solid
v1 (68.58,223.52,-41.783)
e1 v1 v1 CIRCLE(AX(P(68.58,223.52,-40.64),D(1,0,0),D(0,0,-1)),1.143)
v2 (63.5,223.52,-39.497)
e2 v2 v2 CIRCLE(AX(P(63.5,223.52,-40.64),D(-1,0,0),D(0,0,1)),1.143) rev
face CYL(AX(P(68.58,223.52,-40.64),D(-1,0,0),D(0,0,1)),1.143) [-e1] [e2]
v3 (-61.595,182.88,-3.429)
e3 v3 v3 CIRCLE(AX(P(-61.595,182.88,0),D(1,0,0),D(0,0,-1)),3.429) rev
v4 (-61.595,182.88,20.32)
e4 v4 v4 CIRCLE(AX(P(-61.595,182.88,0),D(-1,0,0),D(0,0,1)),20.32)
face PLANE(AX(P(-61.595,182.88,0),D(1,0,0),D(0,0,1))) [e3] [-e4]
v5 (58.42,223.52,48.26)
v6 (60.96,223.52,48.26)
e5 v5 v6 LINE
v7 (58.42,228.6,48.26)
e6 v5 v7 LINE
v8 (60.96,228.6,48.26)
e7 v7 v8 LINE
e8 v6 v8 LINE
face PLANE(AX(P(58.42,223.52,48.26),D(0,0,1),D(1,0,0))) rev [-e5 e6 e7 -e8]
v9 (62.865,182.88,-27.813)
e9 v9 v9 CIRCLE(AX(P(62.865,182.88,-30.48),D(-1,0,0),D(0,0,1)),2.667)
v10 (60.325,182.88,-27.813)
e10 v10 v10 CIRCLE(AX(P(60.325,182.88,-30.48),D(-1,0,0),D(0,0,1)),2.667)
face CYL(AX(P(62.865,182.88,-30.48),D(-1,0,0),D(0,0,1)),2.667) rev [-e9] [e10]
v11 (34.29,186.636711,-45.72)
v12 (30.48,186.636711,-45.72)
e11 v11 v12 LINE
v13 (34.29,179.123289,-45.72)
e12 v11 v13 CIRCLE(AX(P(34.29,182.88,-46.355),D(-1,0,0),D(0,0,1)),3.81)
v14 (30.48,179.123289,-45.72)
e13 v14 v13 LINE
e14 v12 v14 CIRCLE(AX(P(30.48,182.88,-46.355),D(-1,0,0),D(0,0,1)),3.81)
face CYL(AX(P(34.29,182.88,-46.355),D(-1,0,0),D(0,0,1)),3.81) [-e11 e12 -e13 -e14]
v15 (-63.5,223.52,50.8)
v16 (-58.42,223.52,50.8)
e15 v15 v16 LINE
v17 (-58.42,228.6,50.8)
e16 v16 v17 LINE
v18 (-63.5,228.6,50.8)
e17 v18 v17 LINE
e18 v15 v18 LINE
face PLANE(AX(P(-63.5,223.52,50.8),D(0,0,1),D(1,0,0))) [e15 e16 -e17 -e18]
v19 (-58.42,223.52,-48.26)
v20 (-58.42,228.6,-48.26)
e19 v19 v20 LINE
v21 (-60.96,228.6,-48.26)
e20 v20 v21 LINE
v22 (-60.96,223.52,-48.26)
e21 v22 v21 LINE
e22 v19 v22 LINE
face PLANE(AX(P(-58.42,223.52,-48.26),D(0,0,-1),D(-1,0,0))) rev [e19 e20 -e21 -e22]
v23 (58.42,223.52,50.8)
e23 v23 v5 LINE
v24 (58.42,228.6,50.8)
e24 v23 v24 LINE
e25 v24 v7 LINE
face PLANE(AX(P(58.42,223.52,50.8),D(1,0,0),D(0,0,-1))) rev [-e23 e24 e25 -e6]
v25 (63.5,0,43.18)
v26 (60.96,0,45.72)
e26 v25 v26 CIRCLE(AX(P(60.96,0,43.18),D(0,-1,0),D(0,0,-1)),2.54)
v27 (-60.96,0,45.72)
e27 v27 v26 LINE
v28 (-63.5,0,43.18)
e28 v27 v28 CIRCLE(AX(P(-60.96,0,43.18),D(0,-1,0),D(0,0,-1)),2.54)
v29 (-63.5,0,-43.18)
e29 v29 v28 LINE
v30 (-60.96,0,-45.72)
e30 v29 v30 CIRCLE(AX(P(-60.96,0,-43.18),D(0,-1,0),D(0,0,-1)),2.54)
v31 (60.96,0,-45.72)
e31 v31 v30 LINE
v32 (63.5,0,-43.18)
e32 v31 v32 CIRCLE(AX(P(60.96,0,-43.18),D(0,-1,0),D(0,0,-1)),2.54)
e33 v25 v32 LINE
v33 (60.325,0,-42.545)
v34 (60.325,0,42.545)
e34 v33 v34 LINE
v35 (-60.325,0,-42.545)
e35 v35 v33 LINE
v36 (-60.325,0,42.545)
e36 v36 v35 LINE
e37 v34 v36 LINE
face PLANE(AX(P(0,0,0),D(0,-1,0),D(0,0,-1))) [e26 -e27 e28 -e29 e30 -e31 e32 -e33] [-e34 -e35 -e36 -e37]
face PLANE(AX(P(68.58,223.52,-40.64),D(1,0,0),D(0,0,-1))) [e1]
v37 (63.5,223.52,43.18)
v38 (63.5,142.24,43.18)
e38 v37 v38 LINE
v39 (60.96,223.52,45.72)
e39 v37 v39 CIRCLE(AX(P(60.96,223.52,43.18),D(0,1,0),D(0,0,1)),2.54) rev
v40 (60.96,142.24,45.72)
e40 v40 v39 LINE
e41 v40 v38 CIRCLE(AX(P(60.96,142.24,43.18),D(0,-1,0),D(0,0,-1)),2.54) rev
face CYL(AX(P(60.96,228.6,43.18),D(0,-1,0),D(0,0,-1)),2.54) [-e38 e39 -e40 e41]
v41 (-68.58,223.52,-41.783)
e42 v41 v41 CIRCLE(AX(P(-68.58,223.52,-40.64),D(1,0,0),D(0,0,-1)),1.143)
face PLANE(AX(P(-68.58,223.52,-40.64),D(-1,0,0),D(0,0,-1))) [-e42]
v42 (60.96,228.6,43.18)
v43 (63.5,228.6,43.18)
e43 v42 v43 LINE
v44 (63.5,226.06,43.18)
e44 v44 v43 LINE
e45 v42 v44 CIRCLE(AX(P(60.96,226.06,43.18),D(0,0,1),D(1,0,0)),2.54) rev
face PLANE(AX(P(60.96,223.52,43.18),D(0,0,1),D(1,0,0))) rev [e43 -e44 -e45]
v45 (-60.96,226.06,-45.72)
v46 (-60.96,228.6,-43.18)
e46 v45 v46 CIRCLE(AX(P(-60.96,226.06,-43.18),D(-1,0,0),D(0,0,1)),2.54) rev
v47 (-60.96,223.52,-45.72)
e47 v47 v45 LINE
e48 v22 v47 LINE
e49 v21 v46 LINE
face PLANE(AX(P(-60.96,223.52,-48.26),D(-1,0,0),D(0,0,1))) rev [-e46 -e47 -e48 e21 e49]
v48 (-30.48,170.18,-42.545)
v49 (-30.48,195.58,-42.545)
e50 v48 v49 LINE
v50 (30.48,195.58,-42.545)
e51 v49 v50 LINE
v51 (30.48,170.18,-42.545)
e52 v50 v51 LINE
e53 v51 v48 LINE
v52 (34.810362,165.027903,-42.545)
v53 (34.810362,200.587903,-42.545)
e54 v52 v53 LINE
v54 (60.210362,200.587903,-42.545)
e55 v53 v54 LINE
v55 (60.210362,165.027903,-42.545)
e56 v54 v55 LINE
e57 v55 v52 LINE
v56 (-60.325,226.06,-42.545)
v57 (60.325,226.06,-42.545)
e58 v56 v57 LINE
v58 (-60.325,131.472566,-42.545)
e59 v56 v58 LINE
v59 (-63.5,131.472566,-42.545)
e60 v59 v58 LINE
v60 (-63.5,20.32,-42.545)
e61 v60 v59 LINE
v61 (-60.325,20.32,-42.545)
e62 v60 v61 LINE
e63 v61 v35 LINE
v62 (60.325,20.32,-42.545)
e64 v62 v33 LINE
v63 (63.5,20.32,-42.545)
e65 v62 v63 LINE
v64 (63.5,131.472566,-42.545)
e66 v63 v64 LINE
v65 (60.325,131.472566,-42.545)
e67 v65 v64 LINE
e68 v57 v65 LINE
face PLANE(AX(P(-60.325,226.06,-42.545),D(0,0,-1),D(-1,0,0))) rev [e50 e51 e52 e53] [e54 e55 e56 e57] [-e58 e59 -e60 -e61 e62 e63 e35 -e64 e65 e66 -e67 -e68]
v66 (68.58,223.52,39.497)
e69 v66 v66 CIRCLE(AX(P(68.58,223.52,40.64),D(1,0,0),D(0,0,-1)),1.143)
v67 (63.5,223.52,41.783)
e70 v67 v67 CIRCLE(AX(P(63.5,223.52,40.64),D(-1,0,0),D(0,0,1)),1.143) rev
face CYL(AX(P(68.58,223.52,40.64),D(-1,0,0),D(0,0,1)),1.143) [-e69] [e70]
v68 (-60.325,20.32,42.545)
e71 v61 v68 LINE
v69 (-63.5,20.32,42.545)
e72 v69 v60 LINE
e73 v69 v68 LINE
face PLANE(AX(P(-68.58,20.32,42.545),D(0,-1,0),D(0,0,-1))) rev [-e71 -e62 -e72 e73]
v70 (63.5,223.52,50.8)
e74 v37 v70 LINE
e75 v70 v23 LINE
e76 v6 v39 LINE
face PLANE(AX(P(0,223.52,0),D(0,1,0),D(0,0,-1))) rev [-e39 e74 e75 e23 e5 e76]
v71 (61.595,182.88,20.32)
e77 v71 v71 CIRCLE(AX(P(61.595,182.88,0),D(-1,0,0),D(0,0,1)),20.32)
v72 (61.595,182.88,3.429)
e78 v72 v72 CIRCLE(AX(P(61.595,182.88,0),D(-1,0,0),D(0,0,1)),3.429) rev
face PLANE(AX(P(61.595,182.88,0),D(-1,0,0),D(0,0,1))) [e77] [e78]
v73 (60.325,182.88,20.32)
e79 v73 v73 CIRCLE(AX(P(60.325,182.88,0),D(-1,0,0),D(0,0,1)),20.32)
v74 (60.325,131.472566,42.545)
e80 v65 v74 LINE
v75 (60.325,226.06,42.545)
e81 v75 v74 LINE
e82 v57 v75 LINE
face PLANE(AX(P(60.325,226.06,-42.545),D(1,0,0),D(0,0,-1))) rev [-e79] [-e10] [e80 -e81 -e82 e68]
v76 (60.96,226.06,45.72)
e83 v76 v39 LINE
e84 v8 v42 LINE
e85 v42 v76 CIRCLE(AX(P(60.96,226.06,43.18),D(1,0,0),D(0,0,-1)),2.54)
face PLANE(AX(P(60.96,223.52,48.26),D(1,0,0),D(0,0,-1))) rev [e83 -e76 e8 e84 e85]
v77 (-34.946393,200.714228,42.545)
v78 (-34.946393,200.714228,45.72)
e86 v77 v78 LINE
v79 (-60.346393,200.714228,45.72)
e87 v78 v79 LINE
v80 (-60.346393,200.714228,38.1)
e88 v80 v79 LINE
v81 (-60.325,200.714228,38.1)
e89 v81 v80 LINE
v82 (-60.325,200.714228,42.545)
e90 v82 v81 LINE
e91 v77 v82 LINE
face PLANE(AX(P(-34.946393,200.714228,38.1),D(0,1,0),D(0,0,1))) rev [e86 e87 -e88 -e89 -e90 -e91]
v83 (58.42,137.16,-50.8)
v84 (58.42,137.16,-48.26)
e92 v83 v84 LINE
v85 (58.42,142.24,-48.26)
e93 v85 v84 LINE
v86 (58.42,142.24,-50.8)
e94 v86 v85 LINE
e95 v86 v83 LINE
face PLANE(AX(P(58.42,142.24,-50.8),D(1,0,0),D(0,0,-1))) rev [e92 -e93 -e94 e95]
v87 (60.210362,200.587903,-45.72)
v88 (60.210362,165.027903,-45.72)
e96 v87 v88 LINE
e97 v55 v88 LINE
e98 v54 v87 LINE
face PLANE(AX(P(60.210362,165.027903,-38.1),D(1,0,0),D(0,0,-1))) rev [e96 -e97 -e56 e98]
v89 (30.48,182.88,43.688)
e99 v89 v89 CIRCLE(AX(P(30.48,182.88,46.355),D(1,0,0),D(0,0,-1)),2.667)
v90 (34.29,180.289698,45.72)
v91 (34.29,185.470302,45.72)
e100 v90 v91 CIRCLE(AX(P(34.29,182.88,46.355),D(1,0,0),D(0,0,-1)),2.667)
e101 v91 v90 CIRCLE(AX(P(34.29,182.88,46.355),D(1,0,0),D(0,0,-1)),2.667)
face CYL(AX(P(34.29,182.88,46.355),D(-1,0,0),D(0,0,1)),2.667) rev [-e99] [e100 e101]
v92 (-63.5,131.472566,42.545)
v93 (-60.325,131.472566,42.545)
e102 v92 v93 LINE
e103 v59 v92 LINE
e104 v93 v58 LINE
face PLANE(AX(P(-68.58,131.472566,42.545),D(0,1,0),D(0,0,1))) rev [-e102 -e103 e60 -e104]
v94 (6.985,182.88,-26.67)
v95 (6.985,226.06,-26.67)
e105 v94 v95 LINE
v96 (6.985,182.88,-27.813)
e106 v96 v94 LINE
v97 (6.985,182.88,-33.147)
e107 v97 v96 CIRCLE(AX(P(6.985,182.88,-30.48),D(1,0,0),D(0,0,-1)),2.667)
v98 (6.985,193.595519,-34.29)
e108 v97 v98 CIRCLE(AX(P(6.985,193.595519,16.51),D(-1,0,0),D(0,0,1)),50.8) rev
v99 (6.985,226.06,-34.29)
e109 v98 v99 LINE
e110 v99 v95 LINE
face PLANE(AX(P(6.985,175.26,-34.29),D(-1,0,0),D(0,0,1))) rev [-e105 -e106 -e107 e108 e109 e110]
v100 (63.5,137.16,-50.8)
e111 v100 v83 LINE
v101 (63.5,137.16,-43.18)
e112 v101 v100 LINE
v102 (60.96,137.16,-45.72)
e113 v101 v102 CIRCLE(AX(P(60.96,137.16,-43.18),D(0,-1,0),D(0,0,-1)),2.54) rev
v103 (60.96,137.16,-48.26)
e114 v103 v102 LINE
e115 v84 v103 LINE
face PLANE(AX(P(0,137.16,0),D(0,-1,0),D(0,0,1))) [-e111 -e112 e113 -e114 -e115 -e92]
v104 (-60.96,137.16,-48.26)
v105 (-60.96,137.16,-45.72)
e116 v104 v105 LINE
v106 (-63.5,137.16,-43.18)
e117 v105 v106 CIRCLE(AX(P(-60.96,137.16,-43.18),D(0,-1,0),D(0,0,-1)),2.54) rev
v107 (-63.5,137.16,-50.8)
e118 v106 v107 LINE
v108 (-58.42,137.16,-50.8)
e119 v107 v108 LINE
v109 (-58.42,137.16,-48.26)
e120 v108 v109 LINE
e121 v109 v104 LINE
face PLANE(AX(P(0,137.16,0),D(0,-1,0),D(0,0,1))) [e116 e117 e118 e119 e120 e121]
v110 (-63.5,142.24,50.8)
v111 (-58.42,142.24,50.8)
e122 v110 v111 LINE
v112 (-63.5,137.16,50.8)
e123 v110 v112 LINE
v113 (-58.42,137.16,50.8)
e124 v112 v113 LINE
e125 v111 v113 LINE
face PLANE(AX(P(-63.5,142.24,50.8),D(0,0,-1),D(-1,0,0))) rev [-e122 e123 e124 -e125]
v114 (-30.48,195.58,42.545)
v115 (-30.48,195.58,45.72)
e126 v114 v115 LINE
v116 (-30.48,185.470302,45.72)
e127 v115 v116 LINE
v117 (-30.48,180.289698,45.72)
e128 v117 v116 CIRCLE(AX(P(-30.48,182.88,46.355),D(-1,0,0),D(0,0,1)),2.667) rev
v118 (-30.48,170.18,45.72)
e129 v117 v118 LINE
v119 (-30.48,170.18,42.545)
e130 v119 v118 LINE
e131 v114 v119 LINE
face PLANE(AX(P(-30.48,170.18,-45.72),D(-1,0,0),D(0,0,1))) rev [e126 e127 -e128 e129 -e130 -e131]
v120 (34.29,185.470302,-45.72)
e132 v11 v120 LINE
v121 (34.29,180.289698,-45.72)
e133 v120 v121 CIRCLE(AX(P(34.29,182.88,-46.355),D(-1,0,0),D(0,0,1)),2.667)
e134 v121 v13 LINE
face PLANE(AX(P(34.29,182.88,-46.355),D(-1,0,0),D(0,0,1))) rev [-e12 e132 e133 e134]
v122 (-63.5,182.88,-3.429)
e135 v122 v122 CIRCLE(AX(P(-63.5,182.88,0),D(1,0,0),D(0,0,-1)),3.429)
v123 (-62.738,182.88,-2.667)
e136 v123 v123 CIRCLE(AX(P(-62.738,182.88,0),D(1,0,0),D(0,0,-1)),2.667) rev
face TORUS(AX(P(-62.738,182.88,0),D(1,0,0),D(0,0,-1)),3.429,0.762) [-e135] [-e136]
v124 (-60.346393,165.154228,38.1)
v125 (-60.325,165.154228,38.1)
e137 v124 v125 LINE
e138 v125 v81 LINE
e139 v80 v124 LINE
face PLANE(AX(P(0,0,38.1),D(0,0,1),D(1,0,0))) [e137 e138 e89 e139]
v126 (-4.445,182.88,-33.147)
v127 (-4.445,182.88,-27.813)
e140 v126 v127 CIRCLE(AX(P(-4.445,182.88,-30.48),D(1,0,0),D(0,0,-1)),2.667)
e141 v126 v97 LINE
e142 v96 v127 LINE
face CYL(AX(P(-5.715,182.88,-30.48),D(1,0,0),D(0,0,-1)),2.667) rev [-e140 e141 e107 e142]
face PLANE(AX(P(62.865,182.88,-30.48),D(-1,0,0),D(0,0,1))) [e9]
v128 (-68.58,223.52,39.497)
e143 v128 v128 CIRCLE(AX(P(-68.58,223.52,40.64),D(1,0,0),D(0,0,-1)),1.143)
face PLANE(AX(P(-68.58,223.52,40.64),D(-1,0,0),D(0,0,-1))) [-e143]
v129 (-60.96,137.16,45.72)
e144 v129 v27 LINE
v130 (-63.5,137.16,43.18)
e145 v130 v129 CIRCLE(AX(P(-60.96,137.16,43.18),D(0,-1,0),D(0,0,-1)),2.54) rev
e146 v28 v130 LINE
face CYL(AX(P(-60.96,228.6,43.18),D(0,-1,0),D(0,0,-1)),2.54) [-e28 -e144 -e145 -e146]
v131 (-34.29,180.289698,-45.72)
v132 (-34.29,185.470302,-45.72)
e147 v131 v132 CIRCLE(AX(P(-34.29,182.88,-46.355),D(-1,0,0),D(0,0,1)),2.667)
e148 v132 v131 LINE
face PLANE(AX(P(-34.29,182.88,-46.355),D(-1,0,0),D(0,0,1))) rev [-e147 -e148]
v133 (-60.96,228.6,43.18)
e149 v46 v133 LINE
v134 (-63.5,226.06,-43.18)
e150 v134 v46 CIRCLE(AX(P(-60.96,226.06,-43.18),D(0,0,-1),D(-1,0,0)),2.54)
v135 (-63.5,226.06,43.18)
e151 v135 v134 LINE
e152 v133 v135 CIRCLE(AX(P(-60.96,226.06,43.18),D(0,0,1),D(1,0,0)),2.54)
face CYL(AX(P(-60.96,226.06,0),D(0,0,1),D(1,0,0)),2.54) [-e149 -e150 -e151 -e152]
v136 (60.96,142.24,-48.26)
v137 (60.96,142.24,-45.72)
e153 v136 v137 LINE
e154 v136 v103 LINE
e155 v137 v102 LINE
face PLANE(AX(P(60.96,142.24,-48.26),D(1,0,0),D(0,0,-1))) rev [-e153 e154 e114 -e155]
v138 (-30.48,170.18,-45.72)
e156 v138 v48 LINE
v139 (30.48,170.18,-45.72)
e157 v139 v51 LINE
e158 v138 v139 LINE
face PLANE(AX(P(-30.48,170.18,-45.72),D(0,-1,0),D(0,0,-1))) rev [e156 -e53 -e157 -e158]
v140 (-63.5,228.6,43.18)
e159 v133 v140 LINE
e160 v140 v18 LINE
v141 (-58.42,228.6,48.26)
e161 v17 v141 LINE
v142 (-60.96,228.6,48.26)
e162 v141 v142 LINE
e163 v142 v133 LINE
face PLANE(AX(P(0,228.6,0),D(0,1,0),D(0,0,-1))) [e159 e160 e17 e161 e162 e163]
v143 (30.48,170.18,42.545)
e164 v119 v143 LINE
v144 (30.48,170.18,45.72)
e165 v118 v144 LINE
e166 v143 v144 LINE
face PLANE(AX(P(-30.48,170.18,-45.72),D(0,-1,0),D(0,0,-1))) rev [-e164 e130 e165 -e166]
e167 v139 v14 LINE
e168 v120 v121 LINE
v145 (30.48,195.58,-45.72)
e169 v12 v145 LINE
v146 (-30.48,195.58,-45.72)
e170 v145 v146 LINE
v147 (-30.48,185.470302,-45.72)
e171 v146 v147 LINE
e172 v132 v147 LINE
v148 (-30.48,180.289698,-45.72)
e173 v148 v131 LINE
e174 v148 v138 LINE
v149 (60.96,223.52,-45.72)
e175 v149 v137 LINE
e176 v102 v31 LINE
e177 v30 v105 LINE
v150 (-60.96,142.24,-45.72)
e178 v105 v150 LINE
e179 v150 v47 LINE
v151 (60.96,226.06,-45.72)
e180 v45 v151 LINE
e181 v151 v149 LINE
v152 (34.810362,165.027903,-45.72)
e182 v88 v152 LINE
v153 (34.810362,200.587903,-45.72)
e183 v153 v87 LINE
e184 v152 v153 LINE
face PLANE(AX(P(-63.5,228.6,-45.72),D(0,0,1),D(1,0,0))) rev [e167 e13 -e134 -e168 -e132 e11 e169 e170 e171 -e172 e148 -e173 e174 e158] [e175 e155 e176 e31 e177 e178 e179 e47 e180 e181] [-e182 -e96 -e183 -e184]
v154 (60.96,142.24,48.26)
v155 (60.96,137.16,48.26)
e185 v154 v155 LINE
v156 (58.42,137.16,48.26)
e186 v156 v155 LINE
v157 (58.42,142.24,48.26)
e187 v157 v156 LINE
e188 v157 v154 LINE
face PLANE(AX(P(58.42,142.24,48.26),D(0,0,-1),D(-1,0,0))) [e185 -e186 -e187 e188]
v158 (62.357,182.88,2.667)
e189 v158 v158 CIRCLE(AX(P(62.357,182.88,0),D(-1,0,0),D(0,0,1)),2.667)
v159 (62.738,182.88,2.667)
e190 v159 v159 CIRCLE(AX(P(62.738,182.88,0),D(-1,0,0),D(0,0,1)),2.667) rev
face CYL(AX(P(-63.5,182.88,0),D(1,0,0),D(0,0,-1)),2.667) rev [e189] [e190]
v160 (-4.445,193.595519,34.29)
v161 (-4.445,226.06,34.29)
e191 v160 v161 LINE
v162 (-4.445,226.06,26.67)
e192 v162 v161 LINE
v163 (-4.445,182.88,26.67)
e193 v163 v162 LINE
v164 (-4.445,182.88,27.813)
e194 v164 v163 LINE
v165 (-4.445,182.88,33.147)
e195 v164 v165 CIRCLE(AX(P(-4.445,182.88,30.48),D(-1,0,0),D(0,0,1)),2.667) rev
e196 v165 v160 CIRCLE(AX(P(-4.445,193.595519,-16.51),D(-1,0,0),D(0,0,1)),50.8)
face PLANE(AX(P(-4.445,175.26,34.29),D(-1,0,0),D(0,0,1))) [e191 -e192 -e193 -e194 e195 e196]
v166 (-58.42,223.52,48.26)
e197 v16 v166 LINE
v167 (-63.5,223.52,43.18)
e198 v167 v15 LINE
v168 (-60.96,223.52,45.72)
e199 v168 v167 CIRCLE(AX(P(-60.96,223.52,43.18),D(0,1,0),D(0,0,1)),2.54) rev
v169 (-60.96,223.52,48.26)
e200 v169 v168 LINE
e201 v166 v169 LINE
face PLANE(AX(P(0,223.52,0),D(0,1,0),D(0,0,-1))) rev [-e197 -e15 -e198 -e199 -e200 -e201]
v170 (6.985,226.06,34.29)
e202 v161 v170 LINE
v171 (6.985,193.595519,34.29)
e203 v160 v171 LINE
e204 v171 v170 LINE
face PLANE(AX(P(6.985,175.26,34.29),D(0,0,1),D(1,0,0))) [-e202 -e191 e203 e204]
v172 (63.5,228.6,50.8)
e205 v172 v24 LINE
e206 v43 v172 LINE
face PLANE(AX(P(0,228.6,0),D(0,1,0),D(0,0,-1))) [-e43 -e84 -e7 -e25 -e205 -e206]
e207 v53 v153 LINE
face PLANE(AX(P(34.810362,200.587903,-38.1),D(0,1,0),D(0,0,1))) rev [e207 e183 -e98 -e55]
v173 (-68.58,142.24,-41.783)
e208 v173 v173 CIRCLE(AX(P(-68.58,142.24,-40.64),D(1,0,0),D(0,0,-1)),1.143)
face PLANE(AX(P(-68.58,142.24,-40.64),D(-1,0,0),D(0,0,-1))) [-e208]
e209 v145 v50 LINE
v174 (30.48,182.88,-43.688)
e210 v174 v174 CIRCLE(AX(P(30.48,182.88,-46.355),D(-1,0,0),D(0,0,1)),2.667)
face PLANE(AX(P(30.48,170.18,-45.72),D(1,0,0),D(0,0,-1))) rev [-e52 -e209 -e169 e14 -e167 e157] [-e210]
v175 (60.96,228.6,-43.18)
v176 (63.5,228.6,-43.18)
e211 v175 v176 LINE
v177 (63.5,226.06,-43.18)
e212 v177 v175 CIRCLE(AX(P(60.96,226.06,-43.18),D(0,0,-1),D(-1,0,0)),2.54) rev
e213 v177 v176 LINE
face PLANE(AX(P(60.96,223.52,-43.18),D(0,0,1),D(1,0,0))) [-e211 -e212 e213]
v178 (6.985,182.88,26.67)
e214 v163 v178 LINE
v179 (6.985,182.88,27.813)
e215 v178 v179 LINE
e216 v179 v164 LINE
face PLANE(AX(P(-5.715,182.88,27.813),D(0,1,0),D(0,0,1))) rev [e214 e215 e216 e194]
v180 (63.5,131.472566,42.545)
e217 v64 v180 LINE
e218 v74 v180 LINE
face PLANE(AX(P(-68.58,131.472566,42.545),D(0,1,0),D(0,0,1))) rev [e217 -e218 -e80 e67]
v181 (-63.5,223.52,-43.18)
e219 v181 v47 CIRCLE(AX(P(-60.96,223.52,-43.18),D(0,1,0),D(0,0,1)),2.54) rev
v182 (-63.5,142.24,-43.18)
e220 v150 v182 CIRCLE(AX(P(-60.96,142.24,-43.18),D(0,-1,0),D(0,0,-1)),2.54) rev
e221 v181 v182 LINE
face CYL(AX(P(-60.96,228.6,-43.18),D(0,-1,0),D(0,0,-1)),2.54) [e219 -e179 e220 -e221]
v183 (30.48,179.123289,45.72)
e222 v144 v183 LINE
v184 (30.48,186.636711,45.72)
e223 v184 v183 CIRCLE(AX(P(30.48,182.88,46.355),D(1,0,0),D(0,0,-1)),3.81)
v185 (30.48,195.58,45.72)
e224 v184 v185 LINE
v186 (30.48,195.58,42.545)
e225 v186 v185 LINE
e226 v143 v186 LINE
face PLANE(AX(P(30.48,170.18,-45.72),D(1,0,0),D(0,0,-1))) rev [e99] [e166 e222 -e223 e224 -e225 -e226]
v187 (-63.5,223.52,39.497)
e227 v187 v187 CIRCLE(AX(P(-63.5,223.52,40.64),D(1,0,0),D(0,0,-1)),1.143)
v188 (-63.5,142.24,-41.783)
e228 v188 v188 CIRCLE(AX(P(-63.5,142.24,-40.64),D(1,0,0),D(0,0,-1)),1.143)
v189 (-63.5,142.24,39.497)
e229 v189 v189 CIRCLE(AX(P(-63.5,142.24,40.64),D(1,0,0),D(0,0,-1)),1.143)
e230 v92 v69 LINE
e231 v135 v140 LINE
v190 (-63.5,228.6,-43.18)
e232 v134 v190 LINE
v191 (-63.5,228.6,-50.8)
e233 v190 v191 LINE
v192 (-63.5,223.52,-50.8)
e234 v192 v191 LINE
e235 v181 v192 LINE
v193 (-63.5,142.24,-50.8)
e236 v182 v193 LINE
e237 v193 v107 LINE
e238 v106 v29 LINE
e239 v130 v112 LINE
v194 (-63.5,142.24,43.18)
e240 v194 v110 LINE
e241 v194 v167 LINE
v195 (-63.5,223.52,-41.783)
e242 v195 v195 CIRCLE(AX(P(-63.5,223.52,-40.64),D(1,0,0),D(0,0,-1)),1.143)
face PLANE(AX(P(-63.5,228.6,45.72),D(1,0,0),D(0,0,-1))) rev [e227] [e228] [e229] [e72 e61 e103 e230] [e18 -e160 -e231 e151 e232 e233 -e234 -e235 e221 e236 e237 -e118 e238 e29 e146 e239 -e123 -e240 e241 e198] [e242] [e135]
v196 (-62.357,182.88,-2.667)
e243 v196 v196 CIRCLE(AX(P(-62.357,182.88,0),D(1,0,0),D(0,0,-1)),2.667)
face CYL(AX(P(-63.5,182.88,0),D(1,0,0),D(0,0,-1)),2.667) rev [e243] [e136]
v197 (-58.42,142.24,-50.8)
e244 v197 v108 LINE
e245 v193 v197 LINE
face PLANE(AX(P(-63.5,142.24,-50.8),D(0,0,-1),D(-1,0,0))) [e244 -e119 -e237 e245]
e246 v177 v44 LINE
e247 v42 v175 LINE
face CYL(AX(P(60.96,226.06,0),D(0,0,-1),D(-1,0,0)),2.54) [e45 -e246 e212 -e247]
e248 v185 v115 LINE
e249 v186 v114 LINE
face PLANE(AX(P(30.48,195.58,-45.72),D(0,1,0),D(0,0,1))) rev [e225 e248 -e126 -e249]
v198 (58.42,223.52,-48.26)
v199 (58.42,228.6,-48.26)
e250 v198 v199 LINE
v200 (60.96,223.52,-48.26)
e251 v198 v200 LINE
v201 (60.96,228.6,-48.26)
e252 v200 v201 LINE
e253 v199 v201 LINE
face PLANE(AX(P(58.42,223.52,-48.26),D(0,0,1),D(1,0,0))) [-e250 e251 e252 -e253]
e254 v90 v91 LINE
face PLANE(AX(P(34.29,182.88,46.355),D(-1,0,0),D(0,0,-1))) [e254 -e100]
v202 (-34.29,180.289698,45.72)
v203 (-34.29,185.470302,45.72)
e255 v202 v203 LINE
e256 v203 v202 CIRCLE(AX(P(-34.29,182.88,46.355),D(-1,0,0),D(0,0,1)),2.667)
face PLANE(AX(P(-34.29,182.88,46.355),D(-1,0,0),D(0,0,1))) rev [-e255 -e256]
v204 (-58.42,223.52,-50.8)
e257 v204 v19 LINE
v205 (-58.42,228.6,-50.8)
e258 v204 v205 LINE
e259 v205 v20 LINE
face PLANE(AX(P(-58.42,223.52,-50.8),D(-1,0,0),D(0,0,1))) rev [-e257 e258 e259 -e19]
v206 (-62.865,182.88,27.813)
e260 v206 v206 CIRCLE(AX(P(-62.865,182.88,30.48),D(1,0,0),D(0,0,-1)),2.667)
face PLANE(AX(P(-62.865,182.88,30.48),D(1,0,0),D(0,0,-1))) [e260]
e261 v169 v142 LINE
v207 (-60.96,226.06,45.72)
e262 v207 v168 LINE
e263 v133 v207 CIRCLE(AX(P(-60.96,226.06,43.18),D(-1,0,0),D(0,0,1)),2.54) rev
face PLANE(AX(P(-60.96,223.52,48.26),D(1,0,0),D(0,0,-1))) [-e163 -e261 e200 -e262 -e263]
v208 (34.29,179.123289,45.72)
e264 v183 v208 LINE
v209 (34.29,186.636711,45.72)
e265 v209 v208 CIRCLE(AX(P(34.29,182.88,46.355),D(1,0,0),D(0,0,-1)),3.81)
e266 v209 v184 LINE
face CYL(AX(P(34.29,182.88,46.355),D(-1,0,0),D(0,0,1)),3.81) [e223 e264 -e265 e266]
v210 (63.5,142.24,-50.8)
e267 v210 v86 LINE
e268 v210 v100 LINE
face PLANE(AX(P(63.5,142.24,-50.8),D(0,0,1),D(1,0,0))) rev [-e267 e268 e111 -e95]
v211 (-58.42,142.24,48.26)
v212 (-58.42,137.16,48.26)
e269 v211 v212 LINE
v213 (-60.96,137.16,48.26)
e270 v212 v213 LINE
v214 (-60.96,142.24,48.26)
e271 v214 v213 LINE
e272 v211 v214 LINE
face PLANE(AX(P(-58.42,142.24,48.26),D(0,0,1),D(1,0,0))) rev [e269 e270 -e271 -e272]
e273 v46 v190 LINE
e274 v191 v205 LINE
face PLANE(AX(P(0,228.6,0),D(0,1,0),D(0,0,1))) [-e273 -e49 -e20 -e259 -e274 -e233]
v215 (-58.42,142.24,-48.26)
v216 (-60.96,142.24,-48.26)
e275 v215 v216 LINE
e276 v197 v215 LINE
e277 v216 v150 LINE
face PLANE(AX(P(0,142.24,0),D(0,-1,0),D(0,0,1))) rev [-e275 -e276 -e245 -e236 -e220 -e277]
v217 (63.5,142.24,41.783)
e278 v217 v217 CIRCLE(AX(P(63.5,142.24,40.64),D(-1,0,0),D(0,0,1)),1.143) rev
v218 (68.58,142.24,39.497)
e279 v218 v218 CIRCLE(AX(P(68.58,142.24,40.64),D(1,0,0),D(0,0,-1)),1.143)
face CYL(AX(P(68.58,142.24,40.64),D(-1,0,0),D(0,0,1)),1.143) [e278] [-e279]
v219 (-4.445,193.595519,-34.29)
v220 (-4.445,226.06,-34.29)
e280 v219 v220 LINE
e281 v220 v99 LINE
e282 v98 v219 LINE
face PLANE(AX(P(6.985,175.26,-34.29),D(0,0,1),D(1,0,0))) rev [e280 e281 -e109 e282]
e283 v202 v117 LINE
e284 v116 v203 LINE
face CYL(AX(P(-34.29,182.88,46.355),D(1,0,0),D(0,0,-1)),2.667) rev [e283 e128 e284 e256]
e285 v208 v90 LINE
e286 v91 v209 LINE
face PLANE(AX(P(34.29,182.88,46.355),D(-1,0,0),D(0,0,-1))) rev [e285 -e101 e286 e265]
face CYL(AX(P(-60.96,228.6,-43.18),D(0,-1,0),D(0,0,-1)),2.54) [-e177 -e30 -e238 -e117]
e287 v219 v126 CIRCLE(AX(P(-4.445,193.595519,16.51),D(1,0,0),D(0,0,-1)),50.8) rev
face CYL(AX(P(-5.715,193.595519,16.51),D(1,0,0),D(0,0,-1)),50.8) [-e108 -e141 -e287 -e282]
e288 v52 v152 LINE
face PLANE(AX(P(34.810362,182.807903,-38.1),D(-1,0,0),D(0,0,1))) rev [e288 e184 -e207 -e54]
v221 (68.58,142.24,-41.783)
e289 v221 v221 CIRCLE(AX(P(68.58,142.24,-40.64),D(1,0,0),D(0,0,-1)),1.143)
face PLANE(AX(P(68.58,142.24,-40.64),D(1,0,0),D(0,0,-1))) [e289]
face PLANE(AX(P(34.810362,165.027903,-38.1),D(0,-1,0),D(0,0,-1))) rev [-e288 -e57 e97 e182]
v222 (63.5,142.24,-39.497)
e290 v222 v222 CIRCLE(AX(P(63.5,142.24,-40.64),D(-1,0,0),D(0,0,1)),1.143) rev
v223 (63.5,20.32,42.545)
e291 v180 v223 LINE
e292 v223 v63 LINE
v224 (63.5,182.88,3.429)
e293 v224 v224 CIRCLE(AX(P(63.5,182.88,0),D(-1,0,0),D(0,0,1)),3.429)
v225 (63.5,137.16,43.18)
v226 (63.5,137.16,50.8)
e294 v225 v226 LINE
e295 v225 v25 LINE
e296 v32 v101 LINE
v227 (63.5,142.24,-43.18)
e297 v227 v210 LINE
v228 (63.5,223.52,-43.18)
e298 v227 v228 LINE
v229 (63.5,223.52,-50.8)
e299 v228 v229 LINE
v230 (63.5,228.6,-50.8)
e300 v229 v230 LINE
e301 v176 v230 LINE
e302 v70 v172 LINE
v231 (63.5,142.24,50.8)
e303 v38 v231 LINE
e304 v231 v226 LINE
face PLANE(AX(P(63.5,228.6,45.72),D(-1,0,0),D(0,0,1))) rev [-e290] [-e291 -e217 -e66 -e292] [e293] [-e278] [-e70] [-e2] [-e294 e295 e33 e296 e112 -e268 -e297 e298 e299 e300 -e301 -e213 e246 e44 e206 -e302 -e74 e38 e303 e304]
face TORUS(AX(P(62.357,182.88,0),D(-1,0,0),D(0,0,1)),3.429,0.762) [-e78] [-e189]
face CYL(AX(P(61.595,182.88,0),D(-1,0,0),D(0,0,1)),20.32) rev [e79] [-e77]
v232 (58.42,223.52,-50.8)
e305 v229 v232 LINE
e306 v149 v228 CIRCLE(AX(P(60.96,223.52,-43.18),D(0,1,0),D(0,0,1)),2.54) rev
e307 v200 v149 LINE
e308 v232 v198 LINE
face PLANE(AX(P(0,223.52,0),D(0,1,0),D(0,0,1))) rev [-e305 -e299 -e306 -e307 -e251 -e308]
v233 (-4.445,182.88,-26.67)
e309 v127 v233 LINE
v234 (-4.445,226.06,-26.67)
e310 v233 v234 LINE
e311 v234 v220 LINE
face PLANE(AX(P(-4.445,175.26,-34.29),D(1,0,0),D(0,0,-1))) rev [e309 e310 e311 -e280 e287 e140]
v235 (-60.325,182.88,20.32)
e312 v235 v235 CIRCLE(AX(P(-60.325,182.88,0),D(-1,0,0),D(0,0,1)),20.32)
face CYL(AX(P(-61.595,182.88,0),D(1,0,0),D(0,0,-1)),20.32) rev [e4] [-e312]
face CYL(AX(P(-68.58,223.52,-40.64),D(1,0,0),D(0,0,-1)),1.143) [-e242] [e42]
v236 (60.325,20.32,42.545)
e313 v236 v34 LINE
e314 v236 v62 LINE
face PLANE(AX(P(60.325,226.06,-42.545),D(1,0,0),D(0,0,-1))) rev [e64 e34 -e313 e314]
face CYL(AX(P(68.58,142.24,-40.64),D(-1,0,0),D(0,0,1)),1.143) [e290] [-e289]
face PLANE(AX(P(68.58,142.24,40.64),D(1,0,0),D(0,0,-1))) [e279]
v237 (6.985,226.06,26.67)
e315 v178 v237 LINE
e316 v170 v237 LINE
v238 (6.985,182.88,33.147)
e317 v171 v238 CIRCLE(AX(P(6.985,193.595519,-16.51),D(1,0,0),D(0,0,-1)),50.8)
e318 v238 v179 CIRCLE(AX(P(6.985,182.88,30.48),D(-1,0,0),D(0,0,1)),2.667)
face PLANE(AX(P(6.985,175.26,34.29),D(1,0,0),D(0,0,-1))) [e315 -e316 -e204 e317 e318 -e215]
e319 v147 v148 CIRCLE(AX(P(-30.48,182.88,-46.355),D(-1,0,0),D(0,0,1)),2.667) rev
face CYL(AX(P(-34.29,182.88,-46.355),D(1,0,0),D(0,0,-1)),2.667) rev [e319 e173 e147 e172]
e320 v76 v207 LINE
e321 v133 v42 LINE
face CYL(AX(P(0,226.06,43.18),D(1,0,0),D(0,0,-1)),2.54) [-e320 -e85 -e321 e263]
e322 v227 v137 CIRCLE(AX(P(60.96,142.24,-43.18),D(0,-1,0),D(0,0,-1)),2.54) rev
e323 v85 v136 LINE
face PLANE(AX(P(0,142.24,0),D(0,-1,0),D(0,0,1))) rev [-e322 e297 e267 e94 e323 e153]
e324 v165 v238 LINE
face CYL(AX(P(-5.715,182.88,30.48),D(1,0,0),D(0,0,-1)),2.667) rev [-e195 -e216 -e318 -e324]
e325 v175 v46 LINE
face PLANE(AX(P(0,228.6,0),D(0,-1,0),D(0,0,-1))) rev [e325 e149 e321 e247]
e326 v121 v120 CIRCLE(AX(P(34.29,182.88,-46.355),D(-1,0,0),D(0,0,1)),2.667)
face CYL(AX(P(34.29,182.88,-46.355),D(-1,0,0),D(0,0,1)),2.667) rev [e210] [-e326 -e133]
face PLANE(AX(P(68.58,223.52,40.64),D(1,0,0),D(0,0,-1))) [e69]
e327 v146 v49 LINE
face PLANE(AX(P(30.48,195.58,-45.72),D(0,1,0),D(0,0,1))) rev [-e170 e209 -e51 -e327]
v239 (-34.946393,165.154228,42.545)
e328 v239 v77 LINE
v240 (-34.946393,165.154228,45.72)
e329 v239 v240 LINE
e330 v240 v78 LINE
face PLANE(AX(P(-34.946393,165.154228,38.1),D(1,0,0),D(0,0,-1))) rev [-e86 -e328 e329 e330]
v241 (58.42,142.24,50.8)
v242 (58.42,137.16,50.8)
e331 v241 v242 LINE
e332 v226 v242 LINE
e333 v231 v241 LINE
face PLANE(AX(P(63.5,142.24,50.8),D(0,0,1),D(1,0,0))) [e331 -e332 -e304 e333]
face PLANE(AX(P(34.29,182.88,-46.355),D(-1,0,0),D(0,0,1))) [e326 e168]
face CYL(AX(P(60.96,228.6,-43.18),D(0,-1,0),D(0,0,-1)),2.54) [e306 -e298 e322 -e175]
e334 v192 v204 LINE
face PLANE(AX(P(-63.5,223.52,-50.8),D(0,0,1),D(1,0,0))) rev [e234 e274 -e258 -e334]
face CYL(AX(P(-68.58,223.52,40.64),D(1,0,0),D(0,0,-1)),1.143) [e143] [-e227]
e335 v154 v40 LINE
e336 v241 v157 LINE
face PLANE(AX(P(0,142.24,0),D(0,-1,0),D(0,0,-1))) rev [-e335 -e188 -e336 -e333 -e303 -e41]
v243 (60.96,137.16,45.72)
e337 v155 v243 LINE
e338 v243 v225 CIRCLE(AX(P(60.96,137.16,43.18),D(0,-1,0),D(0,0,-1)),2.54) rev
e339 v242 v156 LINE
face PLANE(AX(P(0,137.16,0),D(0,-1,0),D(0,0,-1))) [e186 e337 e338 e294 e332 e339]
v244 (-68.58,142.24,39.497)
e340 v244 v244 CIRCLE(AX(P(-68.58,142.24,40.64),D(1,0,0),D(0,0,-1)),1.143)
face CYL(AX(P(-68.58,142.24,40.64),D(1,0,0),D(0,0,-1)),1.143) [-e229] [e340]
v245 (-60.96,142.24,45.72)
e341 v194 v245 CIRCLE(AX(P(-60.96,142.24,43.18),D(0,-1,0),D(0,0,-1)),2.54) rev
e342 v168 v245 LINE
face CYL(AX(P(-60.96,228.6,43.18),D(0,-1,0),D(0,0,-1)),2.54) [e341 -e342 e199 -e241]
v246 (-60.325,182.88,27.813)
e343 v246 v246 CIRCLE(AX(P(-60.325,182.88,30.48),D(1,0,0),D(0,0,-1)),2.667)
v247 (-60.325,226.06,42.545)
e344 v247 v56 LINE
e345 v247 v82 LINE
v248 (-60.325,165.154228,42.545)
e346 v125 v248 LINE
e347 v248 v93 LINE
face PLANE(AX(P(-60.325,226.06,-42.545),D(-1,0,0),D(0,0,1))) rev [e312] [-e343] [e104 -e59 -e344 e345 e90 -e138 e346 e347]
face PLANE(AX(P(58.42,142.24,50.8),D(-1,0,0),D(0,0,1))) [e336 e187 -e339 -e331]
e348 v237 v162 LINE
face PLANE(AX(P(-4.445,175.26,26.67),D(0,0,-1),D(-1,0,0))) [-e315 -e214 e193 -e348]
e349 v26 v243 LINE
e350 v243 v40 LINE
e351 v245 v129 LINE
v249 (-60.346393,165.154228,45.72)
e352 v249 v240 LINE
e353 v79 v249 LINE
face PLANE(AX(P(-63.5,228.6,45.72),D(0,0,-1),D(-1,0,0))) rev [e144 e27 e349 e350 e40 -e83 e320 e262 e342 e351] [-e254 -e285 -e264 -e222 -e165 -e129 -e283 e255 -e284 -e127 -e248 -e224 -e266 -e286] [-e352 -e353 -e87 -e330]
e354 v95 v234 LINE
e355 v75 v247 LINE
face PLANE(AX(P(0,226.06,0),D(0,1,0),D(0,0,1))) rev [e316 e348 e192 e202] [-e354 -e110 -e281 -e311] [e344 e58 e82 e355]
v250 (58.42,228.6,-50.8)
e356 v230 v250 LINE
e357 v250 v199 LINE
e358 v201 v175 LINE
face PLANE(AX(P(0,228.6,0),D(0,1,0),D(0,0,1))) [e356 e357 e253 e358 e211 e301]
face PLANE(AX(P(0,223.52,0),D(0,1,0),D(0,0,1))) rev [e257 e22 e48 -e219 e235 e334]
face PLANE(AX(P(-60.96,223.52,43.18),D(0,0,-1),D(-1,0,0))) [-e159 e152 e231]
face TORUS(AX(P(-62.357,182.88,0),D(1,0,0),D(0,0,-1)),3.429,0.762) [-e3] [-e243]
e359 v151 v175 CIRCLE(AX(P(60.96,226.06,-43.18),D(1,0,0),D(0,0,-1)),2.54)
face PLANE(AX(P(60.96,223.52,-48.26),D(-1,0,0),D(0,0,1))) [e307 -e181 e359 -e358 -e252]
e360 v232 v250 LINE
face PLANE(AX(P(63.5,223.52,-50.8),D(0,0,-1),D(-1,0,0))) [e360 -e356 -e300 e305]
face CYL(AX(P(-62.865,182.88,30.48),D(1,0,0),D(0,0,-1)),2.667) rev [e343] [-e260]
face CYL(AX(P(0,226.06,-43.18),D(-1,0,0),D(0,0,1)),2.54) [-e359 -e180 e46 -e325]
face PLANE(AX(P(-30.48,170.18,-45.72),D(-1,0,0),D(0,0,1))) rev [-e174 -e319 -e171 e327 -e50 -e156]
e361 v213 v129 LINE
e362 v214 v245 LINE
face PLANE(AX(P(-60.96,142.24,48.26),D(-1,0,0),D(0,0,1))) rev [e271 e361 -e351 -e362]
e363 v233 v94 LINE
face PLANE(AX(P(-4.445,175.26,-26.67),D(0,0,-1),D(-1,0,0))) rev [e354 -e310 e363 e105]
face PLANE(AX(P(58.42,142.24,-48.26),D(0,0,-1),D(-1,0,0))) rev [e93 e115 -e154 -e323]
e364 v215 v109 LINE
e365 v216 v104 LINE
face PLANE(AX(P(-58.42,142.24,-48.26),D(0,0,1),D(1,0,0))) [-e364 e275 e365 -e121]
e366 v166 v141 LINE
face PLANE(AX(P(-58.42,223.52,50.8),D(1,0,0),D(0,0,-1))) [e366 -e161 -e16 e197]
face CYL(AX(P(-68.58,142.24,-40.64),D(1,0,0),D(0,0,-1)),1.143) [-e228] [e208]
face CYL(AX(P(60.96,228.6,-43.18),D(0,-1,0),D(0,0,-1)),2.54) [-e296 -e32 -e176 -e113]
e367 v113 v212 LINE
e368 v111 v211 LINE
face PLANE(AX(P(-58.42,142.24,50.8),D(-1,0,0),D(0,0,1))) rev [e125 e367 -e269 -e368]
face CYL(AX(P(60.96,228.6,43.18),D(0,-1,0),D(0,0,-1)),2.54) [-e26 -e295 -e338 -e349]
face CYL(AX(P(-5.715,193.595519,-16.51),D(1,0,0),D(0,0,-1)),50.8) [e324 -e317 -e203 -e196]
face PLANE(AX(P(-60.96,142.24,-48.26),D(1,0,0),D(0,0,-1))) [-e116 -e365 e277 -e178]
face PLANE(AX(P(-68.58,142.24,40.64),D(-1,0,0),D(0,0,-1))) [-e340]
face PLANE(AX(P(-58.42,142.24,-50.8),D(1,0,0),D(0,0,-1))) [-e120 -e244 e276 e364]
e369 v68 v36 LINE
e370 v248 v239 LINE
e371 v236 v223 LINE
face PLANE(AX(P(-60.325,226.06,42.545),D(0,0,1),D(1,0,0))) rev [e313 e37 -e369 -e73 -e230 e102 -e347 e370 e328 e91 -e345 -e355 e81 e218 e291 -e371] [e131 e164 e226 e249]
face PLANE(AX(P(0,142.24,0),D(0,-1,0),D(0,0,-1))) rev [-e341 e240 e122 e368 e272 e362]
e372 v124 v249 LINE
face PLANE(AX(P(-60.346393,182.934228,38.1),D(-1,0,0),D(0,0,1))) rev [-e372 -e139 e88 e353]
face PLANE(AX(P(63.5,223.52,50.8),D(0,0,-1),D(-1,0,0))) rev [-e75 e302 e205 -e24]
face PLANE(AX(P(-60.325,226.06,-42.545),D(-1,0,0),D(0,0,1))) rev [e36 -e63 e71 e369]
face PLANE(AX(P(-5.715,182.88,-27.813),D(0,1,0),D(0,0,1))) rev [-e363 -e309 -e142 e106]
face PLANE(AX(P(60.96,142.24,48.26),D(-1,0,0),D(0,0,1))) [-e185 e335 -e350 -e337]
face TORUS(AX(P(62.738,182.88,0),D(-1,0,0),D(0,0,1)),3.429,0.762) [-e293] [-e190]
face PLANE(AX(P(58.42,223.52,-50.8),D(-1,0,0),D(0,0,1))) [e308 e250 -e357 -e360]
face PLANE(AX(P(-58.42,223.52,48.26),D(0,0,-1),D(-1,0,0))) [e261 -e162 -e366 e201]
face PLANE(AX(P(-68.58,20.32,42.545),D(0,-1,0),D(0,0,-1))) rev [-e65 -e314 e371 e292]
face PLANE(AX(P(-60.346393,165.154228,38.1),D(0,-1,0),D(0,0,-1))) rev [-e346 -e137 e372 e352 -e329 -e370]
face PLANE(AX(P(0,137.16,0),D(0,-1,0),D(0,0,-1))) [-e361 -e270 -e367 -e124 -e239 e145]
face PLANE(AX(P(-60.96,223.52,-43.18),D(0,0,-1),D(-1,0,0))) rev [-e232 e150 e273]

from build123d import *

# Parameters (mm, degrees)
SKETCH1_W            = 127
SKETCH1_H            = 91.44
BOSS_EXTRUDE1_DEPTH  = 228.6
SKETCH3_W            = 120.65
SKETCH3_H            = 85.09
CUT_EXTRUDE1_DEPTH   = 226.06
SKETCH2_R            = 2.667
CUT_EXTRUDE2_DEPTH   = 266.475570251
SKETCH4_R            = 1.143
BOSS_EXTRUDE3_DEPTH  = 5.08
SKETCH5_R            = 20.32
CUT_EXTRUDE3_DEPTH   = 1.27
FILLET1_R            = 0.762
FILLET2_R            = 0.762
FILLET3_R            = 0.762
SKETCH6_W            = 60.96
SKETCH6_H            = 25.4
CUT_EXTRUDE4_DEPTH   = 256.582569828
FILLET4_R            = 2.54
SKETCH7_W            = 85.09
SKETCH7_H            = 111.152565629
CUT_EXTRUDE5_DEPTH   = 268.942913323
SKETCH10_R           = 2.667
CUT_EXTRUDE6_DEPTH   = 2.54
CUT_EXTRUDE7_DEPTH   = 7.62
SKETCH13_R           = 2.667
CUT_EXTRUDE8_DEPTH   = 2.54
CUT_EXTRUDE9_DEPTH   = 7.62
SKETCH20_W           = 11.43
SKETCH20_H           = 7.62
BOSS_EXTRUDE4_DEPTH  = 50.8
CUT_EXTRUDE10_START  = -12.7
SKETCH21_R           = 2.667
CUT_EXTRUDE10_DEPTH  = 12.7
CUT_EXTRUDE11_DEPTH  = 12.7
SKETCH24_R           = 3.81
BOSS_EXTRUDE5_DEPTH  = 3.81
SKETCH25_R           = 2.667
CUT_EXTRUDE12_DEPTH  = 3.81
CUT_EXTRUDE13_DEPTH  = 12.7
CUT_EXTRUDE14_START  = 64.77
SKETCH27_R           = 2.667
CUT_EXTRUDE14_DEPTH  = 64.77
CUT_EXTRUDE15_START  = 64.77
SKETCH29_R           = 2.667
CUT_EXTRUDE15_DEPTH  = 64.77
FILLET6_R            = 50.8
FILLET7_R            = 50.8
BOSS_EXTRUDE6_DEPTH  = 5.08
MIRROR5_COPY_1_DEPTH = 5.08
MIRROR6_COPY_1_DEPTH = 5.08
MIRROR6_COPY_2_DEPTH = 5.08
MIRROR6_COPY_3_DEPTH = 5.08


with BuildPart() as part:
    # Sketch1 → Boss-Extrude1 (new body)
    with BuildSketch(Plane(origin=(0, 0, 0), x_dir=(1, 0, 0), z_dir=(0, 1, 0))):
        Rectangle(SKETCH1_W, SKETCH1_H)
    extrude(amount=BOSS_EXTRUDE1_DEPTH)

    # Sketch3 → Cut-Extrude1 (cut)
    with BuildSketch(Plane.XZ):
        Rectangle(SKETCH3_W, SKETCH3_H)
    extrude(amount=-CUT_EXTRUDE1_DEPTH, mode=Mode.SUBTRACT)

    # Sketch2 → Cut-Extrude2 (cut, through all)
    with BuildSketch(Plane(origin=(63.5, 0, 0), x_dir=(0, 0, -1), z_dir=(1, 0, 0))):
        with Locations((0, 182.88)):
            Circle(SKETCH2_R)
    extrude(amount=-CUT_EXTRUDE2_DEPTH, mode=Mode.SUBTRACT)

    # Sketch4 → Boss-Extrude3 (add)
    with BuildSketch(Plane(origin=(63.5, 0, 0), x_dir=(0, 0, -1), z_dir=(1, 0, 0))):
        with Locations(Location((-40.64, 223.52, 0), (0, 0, 180))):
            Circle(SKETCH4_R)
        with Locations(Location((40.64, 223.52, 0), (0, 0, 180))):
            Circle(SKETCH4_R)
        with Locations(Location((40.64, 142.24, 0), (0, 0, 180))):
            Circle(SKETCH4_R)
        with Locations(Location((-40.64, 142.24, 0), (0, 0, 180))):
            Circle(SKETCH4_R)
    boss_extrude3 = extrude(amount=BOSS_EXTRUDE3_DEPTH)

    # Sketch5 → Cut-Extrude3 (cut)
    with BuildSketch(Plane.ZY.offset(-60.325)):
        with Locations((0, 182.88)):
            Circle(SKETCH5_R)
    cut_extrude3 = extrude(amount=-CUT_EXTRUDE3_DEPTH, mode=Mode.SUBTRACT)

    # Fillet1
    fillet1_edges = [part.edges().sort_by_distance(p)[0] for p in [
        (61.595, 182.88, 2.667),
    ]]
    fillet(fillet1_edges, radius=FILLET1_R)

    # Fillet2
    fillet2_edges = [part.edges().sort_by_distance(p)[0] for p in [
        (63.5, 182.88, 2.667),
    ]]
    fillet(fillet2_edges, radius=FILLET2_R)

    # Mirror2: Boss-Extrude3, Cut-Extrude3 across plane
    add(boss_extrude3.mirror(Plane(origin=(0, 0, 0), x_dir=(0, 0, 1), z_dir=(1, 0, 0))))
    add(cut_extrude3.mirror(Plane(origin=(0, 0, 0), x_dir=(0, 0, 1), z_dir=(1, 0, 0))), mode=Mode.SUBTRACT)

    # Fillet3
    fillet3_edges = [part.edges().sort_by_distance(p)[0] for p in [
        (-63.5, 182.88, 2.667),
        (-61.595, 182.88, 2.667),
    ]]
    fillet(fillet3_edges, radius=FILLET3_R)

    # Sketch6 → Cut-Extrude4 (cut, through all)
    with BuildSketch(Plane.XY.offset(45.72)):
        with Locations((0, 182.88)):
            Rectangle(SKETCH6_W, SKETCH6_H)
    extrude(amount=-CUT_EXTRUDE4_DEPTH, mode=Mode.SUBTRACT)

    # Fillet4
    fillet4_edges = [part.edges().sort_by_distance(p)[0] for p in [
        (-63.5, 228.6, 0),
        (0, 228.6, 45.72),
        (63.5, 228.6, 0),
        (63.5, 114.3, 45.72),
        (-63.5, 114.3, 45.72),
        (-63.5, 114.3, -45.72),
        (63.5, 114.3, -45.72),
        (0, 228.6, -45.72),
    ]]
    fillet(fillet4_edges, radius=FILLET4_R)

    # Sketch7 → Cut-Extrude5 (cut, through all)
    with BuildSketch(Plane(origin=(63.5, 0, 0), x_dir=(0, 0, -1), z_dir=(1, 0, 0))):
        with Locations((0, 75.896282814)):
            Rectangle(SKETCH7_W, SKETCH7_H)
    extrude(amount=-CUT_EXTRUDE5_DEPTH, mode=Mode.SUBTRACT)

    # Sketch10 → Cut-Extrude6 (cut)
    with BuildSketch(Plane.ZY.offset(-60.325)):
        with Locations((-30.48, 182.88)):
            Circle(SKETCH10_R)
    extrude(amount=-CUT_EXTRUDE6_DEPTH, mode=Mode.SUBTRACT)

    # Sketch12 → Cut-Extrude7 (cut)
    with BuildSketch(Plane(origin=(0, 0, -45.72), x_dir=(-1, 0, 0), z_dir=(0, 0, -1))):
        Polygon((-34.810362372, 182.807903476), (-34.810362372, 200.587903476), (-60.210362372, 200.587903476), (-60.210362372, 182.807903476), (-60.210362372, 165.027903476), (-34.810362372, 165.027903476), align=None)
    extrude(amount=-CUT_EXTRUDE7_DEPTH, mode=Mode.SUBTRACT)

    # Sketch13 → Cut-Extrude8 (cut)
    with BuildSketch(Plane(origin=(-60.325, 0, 0), x_dir=(0, 0, -1), z_dir=(1, 0, 0))):
        with Locations((-30.48, 182.88)):
            Circle(SKETCH13_R)
    extrude(amount=-CUT_EXTRUDE8_DEPTH, mode=Mode.SUBTRACT)

    # Sketch16 → Cut-Extrude9 (cut)
    with BuildSketch(Plane.XY.offset(45.72)):
        Polygon((-60.34639287, 182.934228321), (-60.34639287, 200.714228321), (-34.94639287, 200.714228321), (-34.94639287, 165.154228321), (-60.34639287, 165.154228321), align=None)
    extrude(amount=-CUT_EXTRUDE9_DEPTH, mode=Mode.SUBTRACT)

    # Sketch20 → Boss-Extrude4 (add)
    with BuildSketch(Plane.XZ.offset(-226.06)):
        with Locations((1.27, -30.48)):
            Rectangle(SKETCH20_W, SKETCH20_H)
    boss_extrude4 = extrude(amount=BOSS_EXTRUDE4_DEPTH)

    # Sketch21 → Cut-Extrude10 (cut)
    with BuildSketch(Plane(origin=(6.985, 0, 0), x_dir=(0, 0, -1), z_dir=(1, 0, 0)).offset(CUT_EXTRUDE10_START)):
        with Locations(Location((30.48, 182.88, 0), (0, 0, 180))):
            Circle(SKETCH21_R)
    cut_extrude10 = extrude(amount=CUT_EXTRUDE10_DEPTH, mode=Mode.SUBTRACT)

    # Sketch23 → Cut-Extrude11 (cut)
    with BuildSketch(Plane(origin=(6.985, 0, 0), x_dir=(0, 0, -1), z_dir=(1, 0, 0))):
        Polygon((27.813, 182.88), (26.67, 182.88), (26.67, 175.26), (34.29, 175.26), (34.29, 182.88), align=None)
    extrude(amount=-CUT_EXTRUDE11_DEPTH, mode=Mode.SUBTRACT)

    # Sketch24 → Boss-Extrude5 (add)
    with BuildSketch(Plane.ZY.offset(-30.48)):
        with Locations((-46.355, 182.88)):
            Circle(SKETCH24_R)
    boss_extrude5 = extrude(amount=-BOSS_EXTRUDE5_DEPTH)

    # Sketch25 → Cut-Extrude12 (cut)
    with BuildSketch(Plane.ZY.offset(-30.48)):
        with Locations((-46.355, 182.88)):
            Circle(SKETCH25_R)
    cut_extrude12 = extrude(amount=-CUT_EXTRUDE12_DEPTH, mode=Mode.SUBTRACT)

    # Mirror3: Boss-Extrude4, Cut-Extrude10, Boss-Extrude5, Cut-Extrude12 across plane
    add(boss_extrude4.mirror(Plane.XY))
    add(cut_extrude10.mirror(Plane.XY), mode=Mode.SUBTRACT)
    add(boss_extrude5.mirror(Plane.XY))
    add(cut_extrude12.mirror(Plane.XY), mode=Mode.SUBTRACT)

    # Sketch26 → Cut-Extrude13 (cut)
    with BuildSketch(Plane(origin=(6.985, 0, 0), x_dir=(0, 0, -1), z_dir=(1, 0, 0))):
        Polygon((-27.813, 182.88), (-26.67, 182.88), (-26.67, 175.26), (-34.29, 175.26), (-34.29, 182.88), align=None)
    extrude(amount=-CUT_EXTRUDE13_DEPTH, mode=Mode.SUBTRACT)

    # Sketch27 → Cut-Extrude14 (cut)
    with BuildSketch(Plane.ZY.offset(-30.48).offset(CUT_EXTRUDE14_START)):
        with Locations((-46.355, 182.88)):
            Circle(SKETCH27_R)
    extrude(amount=-CUT_EXTRUDE14_DEPTH, mode=Mode.SUBTRACT)

    # Sketch29 → Cut-Extrude15 (cut)
    with BuildSketch(Plane.ZY.offset(-30.48).offset(CUT_EXTRUDE15_START)):
        with Locations(Location((46.355, 182.88, 0), (0, 0, 256.225853002))):
            Circle(SKETCH29_R)
    extrude(amount=-CUT_EXTRUDE15_DEPTH, mode=Mode.SUBTRACT)

    # Fillet6
    # the kernel refuses this fillet: 50.8 mm, written as the material it takes off along each edge
    with BuildSketch(Plane(origin=(33.773797915, 182.88, 34.29), x_dir=(0, 0, -1), z_dir=(-1, 0, 0))) as fillet6_piece_1:
        with BuildLine():
            CenterArc((50.8, -10.715519166), FILLET6_R, 167.822824326, 12.177175674)
            Line((0, -10.715519166), (-1.016, -10.715519166))
            Line((-1.016, -10.715519166), (-1.016, 0))
            Line((-1.016, 0), (0, 1.016))
            ThreePointArc((0, 1.016), (0.5715, 1.016), (0.14986, 0.214310383))
            Line((0.14986, 0.214310383), (1.143, 0))
        make_face()
    extrude(amount=65.007595831, mode=Mode.SUBTRACT)

    # Fillet7
    # the kernel refuses this fillet: 50.8 mm, written as the material it takes off along each edge
    with BuildSketch(Plane(origin=(33.773797915, 182.88, -34.29), x_dir=(0, 1, 0), z_dir=(-1, 0, 0))) as fillet7_piece_1:
        with BuildLine():
            CenterArc((10.715519166, -50.8), FILLET7_R, 90, 12.177175674)
            Line((0, -1.143), (0, 0))
            Line((0, 0), (10.715519166, 0))
        make_face()
    extrude(amount=65.007595831, mode=Mode.SUBTRACT)

    # Sketch33 → Boss-Extrude6 (add)
    with BuildSketch(Plane(origin=(0, 228.6, 0), x_dir=(1, 0, 0), z_dir=(0, 1, 0))):
        Polygon((63.5, 43.18), (63.5, 50.8), (58.42, 50.8), (58.42, 48.26), (60.96, 48.26), (60.96, 43.18), align=None)
    boss_extrude6 = extrude(amount=-BOSS_EXTRUDE6_DEPTH)

    # Mirror4: Boss-Extrude6 across plane
    add(boss_extrude6.mirror(Plane(origin=(0, 0, 0), x_dir=(0, 0, 1), z_dir=(1, 0, 0))))

    # Mirror5: Boss-Extrude6 across plane
    add(boss_extrude6.mirror(Plane.ZX.offset(182.88)))

    # Mirror5 copy 1 sketch → Mirror5 copy 1 (add)
    with BuildSketch(Plane(origin=(0, 137.16, 0), x_dir=(-1, 0, 0), z_dir=(0, -1, 0))):
        Polygon((63.5, 43.18), (63.5, 50.8), (58.42, 50.8), (58.42, 48.26), (60.96, 48.26), (60.96, 43.18), align=None)
    extrude(amount=-MIRROR5_COPY_1_DEPTH)

    # Mirror6: Boss-Extrude6 across plane
    add(boss_extrude6.mirror(Plane.XY))

    # Mirror6 copy 1 sketch → Mirror6 copy 1 (add)
    with BuildSketch(Plane(origin=(0, 228.6, 0), x_dir=(-1, 0, 0), z_dir=(0, 1, 0))):
        Polygon((63.5, 43.18), (63.5, 50.8), (58.42, 50.8), (58.42, 48.26), (60.96, 48.26), (60.96, 43.18), align=None)
    extrude(amount=-MIRROR6_COPY_1_DEPTH)

    # Mirror6 copy 2 sketch → Mirror6 copy 2 (add)
    with BuildSketch(Plane.XZ.offset(-137.16)):
        Polygon((63.5, 43.18), (63.5, 50.8), (58.42, 50.8), (58.42, 48.26), (60.96, 48.26), (60.96, 43.18), align=None)
    extrude(amount=-MIRROR6_COPY_2_DEPTH)

    # Mirror6 copy 3 sketch → Mirror6 copy 3 (add)
    with BuildSketch(Plane(origin=(0, 137.16, 0), x_dir=(-1, 0, 0), z_dir=(0, -1, 0))):
        Polygon((63.5, -43.18), (63.5, -50.8), (58.42, -50.8), (58.42, -48.26), (60.96, -48.26), (60.96, -43.18), align=None)
    extrude(amount=-MIRROR6_COPY_3_DEPTH)


solid = part.part
